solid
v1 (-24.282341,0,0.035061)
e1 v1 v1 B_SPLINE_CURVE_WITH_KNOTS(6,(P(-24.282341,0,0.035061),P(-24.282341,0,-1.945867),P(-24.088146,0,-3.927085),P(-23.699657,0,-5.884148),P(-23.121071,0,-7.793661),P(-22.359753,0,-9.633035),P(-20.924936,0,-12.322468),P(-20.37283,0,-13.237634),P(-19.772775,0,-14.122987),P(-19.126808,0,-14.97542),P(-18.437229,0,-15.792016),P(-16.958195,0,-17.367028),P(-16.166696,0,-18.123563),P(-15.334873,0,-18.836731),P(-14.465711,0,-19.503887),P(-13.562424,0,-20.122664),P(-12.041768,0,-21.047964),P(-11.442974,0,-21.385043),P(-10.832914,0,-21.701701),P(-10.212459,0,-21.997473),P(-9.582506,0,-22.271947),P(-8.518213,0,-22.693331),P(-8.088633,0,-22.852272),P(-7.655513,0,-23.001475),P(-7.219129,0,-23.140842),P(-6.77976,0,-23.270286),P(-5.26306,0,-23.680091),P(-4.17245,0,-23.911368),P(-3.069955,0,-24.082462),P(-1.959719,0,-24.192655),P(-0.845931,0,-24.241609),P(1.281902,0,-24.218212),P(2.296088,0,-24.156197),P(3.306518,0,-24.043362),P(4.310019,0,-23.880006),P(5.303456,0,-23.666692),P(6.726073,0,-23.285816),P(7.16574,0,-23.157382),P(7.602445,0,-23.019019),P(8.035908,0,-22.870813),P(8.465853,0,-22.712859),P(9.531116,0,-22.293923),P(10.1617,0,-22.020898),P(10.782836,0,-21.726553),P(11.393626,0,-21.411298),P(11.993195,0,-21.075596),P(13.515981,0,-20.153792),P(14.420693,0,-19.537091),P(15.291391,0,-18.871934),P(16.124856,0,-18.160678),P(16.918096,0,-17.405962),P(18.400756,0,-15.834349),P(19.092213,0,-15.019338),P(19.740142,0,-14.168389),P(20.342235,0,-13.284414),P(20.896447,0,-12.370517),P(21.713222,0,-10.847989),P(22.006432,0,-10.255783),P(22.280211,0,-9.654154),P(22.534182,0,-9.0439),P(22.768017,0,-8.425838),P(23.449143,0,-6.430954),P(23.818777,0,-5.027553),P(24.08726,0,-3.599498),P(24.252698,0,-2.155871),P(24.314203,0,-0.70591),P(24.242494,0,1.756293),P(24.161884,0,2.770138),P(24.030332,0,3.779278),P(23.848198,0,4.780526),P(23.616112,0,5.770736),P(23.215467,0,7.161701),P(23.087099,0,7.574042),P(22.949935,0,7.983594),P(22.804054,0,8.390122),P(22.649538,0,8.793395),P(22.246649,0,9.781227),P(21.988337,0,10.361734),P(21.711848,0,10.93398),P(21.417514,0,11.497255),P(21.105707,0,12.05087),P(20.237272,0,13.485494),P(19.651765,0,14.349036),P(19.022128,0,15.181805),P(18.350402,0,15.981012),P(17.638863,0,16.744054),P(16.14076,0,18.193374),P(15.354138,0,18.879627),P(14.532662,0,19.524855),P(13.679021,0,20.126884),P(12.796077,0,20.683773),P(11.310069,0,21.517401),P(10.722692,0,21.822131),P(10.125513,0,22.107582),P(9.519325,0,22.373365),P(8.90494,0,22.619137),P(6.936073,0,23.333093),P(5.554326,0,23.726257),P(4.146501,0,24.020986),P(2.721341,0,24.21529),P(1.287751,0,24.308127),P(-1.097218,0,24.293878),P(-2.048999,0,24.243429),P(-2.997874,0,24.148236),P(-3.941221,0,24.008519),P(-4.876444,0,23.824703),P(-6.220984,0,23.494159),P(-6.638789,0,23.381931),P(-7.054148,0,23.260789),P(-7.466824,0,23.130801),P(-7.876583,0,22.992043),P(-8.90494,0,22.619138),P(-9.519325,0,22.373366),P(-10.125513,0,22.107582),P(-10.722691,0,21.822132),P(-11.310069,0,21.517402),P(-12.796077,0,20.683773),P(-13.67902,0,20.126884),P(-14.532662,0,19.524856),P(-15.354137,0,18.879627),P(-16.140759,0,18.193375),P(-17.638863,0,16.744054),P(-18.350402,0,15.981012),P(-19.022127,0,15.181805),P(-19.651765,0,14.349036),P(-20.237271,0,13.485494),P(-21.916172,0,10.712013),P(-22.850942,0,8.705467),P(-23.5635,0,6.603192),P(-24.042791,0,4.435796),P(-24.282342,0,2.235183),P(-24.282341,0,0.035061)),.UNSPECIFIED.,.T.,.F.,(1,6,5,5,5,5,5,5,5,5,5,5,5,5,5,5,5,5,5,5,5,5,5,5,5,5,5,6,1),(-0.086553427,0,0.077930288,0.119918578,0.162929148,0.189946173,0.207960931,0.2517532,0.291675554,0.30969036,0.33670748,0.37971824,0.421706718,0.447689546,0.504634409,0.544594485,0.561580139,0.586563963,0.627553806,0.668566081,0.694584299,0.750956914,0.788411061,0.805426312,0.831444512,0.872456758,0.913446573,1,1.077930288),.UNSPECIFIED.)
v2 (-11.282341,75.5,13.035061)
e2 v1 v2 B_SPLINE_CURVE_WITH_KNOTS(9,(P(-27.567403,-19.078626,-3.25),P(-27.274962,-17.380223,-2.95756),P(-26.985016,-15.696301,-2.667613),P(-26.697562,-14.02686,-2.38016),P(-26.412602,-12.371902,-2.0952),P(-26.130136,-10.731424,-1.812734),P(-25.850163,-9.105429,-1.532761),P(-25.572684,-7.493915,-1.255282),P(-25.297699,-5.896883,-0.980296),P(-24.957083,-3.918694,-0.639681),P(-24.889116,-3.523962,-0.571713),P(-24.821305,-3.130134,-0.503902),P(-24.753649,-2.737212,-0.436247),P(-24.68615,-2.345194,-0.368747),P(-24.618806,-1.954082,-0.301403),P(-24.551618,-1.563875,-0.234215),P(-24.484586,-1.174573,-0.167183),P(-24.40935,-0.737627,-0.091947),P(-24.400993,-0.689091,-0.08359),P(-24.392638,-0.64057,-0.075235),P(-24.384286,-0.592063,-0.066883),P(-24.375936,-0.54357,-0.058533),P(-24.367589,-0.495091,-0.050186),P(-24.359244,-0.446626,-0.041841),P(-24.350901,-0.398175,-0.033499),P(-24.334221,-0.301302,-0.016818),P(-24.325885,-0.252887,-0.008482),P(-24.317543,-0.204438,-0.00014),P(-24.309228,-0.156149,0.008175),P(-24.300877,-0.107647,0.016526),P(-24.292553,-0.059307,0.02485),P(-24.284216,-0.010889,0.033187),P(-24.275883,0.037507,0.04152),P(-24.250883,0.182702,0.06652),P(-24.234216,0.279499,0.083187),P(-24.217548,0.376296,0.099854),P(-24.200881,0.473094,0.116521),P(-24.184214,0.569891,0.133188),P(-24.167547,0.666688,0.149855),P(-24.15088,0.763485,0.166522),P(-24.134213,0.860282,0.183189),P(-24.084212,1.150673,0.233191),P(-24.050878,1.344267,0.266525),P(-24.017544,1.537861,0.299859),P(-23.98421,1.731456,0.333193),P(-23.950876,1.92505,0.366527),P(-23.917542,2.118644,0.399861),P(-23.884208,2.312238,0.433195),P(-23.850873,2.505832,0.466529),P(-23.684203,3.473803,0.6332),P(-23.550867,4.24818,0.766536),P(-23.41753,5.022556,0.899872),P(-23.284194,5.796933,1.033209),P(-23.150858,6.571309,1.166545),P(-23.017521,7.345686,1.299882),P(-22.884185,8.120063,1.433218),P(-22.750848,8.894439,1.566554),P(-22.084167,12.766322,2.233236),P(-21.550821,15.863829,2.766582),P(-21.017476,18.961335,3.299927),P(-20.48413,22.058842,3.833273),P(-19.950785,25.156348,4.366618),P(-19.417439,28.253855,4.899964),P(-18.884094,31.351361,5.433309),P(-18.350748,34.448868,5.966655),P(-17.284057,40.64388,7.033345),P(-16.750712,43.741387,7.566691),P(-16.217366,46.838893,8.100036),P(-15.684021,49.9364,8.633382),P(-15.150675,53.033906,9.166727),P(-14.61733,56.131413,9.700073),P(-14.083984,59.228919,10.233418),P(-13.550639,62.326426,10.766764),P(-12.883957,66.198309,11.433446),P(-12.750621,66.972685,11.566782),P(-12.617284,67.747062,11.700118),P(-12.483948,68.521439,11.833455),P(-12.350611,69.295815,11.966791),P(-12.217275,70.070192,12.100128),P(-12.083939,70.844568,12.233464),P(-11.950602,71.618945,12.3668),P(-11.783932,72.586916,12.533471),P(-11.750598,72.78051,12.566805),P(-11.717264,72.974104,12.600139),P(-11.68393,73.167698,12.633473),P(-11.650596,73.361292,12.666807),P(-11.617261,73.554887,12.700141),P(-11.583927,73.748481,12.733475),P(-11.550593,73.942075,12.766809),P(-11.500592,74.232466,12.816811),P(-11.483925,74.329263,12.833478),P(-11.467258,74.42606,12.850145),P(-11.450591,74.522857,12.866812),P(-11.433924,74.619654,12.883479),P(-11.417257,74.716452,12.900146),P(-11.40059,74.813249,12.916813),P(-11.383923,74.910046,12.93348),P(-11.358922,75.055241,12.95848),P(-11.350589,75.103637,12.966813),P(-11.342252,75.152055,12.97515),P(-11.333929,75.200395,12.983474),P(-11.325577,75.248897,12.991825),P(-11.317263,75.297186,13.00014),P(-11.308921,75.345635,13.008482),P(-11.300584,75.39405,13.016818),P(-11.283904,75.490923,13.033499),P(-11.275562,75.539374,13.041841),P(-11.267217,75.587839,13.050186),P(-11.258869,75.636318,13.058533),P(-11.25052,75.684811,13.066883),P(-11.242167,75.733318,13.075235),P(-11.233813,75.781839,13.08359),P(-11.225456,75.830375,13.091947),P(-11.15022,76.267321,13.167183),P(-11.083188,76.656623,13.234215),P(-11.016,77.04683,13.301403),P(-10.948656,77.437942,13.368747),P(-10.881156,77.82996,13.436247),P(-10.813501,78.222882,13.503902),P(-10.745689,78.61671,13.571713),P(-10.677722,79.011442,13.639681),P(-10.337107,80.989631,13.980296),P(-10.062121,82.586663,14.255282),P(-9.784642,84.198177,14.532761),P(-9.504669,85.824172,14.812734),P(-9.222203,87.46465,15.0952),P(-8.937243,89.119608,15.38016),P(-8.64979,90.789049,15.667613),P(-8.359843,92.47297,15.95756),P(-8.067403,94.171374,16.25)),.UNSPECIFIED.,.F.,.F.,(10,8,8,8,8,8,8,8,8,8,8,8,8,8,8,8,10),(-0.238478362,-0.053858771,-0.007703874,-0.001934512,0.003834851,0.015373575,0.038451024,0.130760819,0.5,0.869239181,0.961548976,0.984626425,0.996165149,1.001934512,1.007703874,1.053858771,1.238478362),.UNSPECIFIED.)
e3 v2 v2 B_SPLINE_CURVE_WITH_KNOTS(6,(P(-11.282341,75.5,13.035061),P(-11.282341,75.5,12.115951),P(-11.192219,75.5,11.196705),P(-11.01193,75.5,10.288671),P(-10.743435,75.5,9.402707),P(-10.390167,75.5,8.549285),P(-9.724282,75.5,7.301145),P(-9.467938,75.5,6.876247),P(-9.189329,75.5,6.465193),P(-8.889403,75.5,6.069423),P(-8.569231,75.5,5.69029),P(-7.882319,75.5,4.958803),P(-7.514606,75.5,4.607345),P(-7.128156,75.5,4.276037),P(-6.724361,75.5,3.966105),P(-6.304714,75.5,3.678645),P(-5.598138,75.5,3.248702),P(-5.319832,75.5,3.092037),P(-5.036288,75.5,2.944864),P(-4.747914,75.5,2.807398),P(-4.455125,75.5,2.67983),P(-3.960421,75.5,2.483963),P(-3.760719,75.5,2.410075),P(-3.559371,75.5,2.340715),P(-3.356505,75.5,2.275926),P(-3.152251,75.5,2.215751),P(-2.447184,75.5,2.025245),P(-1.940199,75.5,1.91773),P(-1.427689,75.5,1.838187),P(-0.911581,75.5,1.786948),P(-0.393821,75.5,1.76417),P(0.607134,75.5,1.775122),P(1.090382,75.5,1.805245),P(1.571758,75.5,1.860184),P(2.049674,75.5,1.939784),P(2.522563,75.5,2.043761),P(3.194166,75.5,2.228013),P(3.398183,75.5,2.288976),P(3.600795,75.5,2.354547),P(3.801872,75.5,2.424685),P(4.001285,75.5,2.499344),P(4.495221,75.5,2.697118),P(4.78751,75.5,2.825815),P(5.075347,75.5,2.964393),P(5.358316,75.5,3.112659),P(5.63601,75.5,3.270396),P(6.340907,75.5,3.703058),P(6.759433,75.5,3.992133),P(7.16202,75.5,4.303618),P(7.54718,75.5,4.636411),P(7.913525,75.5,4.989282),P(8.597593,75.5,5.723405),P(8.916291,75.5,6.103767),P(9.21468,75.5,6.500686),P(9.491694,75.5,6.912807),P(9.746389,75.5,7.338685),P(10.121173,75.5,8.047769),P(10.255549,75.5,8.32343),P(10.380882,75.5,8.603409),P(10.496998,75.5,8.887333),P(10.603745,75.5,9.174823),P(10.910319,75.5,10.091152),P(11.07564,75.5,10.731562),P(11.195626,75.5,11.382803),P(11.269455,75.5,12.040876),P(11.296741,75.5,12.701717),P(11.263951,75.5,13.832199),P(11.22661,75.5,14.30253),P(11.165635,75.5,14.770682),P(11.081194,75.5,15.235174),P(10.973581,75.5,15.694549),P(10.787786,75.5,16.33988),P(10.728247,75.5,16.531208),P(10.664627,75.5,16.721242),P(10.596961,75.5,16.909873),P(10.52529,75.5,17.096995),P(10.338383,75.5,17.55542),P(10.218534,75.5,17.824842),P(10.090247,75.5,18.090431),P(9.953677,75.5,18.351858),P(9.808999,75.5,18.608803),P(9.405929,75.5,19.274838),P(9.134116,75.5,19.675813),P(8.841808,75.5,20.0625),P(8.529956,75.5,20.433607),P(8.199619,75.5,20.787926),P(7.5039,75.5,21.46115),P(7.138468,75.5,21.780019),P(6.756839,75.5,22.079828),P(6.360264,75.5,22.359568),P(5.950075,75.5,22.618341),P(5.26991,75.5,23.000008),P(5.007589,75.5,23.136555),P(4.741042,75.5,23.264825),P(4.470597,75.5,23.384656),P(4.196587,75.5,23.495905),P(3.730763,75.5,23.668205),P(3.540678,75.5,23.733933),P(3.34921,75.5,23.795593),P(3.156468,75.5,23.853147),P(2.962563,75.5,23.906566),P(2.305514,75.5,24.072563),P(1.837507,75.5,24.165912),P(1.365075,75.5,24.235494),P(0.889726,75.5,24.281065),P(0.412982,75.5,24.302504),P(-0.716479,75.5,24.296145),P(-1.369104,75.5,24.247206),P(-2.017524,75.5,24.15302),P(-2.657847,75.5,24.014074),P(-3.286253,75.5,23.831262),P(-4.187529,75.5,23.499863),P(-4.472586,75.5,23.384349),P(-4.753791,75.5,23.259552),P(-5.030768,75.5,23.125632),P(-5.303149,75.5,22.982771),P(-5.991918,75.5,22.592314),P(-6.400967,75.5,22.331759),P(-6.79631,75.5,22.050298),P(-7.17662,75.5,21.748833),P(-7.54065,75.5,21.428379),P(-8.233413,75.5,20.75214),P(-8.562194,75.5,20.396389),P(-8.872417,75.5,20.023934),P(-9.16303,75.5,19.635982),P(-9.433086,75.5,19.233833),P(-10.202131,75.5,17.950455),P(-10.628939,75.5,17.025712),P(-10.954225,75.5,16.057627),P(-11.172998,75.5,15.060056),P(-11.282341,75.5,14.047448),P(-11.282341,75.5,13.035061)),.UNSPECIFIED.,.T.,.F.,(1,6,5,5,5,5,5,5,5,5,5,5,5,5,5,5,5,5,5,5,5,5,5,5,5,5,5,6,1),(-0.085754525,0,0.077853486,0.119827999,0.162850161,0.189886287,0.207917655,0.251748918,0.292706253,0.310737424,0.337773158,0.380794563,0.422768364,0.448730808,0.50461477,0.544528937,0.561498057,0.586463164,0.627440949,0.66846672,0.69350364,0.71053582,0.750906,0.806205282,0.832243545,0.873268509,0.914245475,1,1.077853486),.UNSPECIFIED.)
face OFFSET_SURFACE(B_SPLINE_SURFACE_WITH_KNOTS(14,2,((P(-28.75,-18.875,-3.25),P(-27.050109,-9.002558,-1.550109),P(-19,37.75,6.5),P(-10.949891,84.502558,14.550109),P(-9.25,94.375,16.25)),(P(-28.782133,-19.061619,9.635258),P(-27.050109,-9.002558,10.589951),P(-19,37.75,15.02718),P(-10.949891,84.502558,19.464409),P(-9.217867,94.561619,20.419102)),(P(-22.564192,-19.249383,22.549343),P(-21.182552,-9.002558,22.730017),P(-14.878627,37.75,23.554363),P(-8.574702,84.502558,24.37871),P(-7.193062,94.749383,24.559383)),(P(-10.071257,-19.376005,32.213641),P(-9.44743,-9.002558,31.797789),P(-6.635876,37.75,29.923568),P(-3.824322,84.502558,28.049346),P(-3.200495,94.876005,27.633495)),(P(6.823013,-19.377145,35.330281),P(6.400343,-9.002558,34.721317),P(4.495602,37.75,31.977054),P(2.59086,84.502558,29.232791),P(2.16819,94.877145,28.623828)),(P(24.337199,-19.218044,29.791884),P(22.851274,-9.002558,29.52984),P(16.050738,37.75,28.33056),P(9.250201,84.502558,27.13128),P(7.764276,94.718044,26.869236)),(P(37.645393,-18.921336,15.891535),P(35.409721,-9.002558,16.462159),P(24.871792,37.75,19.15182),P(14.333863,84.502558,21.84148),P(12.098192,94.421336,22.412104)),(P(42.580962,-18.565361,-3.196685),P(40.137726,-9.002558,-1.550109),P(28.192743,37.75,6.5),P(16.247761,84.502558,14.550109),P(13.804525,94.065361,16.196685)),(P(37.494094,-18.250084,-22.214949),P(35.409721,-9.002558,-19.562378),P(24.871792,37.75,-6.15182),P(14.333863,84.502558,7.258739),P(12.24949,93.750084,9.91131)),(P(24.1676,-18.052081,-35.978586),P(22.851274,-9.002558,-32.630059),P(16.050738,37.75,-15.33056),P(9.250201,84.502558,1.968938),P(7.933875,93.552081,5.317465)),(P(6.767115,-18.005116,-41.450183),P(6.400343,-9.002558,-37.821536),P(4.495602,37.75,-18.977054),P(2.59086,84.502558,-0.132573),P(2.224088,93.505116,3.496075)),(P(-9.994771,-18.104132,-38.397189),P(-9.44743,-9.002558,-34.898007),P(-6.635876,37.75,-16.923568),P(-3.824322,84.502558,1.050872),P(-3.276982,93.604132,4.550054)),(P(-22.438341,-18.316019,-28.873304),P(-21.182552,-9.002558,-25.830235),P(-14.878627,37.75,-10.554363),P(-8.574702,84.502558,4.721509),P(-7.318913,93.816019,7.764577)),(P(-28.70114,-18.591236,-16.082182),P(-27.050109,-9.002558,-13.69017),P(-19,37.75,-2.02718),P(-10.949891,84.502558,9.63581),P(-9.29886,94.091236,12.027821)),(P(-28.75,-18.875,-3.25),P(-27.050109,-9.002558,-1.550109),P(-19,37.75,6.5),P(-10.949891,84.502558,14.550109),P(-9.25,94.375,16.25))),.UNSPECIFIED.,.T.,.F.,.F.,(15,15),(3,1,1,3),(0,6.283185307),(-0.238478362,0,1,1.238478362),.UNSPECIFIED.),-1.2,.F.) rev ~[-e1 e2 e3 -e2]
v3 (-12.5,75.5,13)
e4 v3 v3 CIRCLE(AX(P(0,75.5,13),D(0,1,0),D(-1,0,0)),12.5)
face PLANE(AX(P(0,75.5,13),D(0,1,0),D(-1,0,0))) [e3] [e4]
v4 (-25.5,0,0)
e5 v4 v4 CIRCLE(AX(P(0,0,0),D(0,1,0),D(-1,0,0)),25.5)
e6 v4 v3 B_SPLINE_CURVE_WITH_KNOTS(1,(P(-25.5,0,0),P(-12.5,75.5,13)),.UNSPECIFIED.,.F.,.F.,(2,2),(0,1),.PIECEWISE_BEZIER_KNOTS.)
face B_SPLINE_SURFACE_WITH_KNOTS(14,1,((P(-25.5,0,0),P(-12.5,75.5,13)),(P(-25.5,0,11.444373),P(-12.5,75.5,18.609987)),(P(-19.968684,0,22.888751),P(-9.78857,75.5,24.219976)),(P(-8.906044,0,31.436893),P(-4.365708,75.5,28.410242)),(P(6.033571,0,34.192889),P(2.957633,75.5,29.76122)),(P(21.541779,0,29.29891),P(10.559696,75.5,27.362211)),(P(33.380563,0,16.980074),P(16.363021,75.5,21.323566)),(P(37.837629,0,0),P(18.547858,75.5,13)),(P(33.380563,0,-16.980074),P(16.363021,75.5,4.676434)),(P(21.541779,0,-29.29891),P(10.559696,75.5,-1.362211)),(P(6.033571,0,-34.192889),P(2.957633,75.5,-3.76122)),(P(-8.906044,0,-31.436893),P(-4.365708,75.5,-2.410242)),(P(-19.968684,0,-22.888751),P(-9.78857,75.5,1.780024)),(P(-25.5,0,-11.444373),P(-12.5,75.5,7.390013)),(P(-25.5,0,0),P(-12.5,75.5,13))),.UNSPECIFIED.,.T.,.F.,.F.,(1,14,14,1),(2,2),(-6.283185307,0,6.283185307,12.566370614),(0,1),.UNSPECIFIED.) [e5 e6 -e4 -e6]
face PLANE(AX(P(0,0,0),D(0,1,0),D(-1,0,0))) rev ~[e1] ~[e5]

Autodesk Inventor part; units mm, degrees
ref_plane "YZ Plane" through (0, 0, 0) normal (1, 0, 0) x (0, 1, 0)
ref_plane "XY Plane" through (0, 0, 0) normal (0, 0, 1) x (1, 0, 0)
sketch "Szkic6" plane through (0, 0, 0) normal (0, 1, 0) x (-1, 0, 0)
  circle A0 centre (0, 0) radius 25.5
  dimension "d33" = 51
ref_plane "Płaszczyzna konstrukcyjna1" through (0, 75.5, 0) normal (0, 1, 0) x (-1, 0, 0)
sketch "Szkic7" plane through (0, 75.5, 0) normal (0, 1, 0) x (-1, 0, 0)
  circle A0 centre (0, 13) radius 12.5
  line L0 (0, -20.3) -> (0, 20.3) construction
  circle A1 centre (0, 0) radius 25.5 construction
  dimension "d35" = 25
loft "Wyciągnięcie złożone1" add profiles "Szkic6", "Szkic7"
shell "Skorupa1" thickness 1.2 removed faces 2 at (-0.5022, 75.5, 6.8694) at (4.5479, 0, -4.6843)
equation "\"d33\" = OD1"
equation "\"d35\" = OD2"
equation "\"d52\" = THK"
equation "\"SzerokośćGięciaPodcięcia\" = Grubość"
equation "\"RozmiarPodcięciaNarożnika\" = 4 * Grubość"
equation "\"PromieńPrzejścia\" = PromieńGięcia"
equation "\"Rozmiar_promienia_Jacobiego\" = PromieńGięcia"
equation "\"Wielk_odstępu\" = Grubość"
equation "\"d2\" = PromieńGięcia"
equation "\"d23\" = PromieńGięcia"
equation "\"OD1\" = 51"
equation "\"OD2\" = 25"
equation "\"L\" = 75.5"
equation "\"THK\" = 1.2"
equation "\"d34\" = L"
equation "\"Grubość\" = 1.5"
equation "\"PromieńGięcia\" = 3"
properties part number "Redukcja asymetryczna Ø51x25x1,2 L=75,5" material "304"
